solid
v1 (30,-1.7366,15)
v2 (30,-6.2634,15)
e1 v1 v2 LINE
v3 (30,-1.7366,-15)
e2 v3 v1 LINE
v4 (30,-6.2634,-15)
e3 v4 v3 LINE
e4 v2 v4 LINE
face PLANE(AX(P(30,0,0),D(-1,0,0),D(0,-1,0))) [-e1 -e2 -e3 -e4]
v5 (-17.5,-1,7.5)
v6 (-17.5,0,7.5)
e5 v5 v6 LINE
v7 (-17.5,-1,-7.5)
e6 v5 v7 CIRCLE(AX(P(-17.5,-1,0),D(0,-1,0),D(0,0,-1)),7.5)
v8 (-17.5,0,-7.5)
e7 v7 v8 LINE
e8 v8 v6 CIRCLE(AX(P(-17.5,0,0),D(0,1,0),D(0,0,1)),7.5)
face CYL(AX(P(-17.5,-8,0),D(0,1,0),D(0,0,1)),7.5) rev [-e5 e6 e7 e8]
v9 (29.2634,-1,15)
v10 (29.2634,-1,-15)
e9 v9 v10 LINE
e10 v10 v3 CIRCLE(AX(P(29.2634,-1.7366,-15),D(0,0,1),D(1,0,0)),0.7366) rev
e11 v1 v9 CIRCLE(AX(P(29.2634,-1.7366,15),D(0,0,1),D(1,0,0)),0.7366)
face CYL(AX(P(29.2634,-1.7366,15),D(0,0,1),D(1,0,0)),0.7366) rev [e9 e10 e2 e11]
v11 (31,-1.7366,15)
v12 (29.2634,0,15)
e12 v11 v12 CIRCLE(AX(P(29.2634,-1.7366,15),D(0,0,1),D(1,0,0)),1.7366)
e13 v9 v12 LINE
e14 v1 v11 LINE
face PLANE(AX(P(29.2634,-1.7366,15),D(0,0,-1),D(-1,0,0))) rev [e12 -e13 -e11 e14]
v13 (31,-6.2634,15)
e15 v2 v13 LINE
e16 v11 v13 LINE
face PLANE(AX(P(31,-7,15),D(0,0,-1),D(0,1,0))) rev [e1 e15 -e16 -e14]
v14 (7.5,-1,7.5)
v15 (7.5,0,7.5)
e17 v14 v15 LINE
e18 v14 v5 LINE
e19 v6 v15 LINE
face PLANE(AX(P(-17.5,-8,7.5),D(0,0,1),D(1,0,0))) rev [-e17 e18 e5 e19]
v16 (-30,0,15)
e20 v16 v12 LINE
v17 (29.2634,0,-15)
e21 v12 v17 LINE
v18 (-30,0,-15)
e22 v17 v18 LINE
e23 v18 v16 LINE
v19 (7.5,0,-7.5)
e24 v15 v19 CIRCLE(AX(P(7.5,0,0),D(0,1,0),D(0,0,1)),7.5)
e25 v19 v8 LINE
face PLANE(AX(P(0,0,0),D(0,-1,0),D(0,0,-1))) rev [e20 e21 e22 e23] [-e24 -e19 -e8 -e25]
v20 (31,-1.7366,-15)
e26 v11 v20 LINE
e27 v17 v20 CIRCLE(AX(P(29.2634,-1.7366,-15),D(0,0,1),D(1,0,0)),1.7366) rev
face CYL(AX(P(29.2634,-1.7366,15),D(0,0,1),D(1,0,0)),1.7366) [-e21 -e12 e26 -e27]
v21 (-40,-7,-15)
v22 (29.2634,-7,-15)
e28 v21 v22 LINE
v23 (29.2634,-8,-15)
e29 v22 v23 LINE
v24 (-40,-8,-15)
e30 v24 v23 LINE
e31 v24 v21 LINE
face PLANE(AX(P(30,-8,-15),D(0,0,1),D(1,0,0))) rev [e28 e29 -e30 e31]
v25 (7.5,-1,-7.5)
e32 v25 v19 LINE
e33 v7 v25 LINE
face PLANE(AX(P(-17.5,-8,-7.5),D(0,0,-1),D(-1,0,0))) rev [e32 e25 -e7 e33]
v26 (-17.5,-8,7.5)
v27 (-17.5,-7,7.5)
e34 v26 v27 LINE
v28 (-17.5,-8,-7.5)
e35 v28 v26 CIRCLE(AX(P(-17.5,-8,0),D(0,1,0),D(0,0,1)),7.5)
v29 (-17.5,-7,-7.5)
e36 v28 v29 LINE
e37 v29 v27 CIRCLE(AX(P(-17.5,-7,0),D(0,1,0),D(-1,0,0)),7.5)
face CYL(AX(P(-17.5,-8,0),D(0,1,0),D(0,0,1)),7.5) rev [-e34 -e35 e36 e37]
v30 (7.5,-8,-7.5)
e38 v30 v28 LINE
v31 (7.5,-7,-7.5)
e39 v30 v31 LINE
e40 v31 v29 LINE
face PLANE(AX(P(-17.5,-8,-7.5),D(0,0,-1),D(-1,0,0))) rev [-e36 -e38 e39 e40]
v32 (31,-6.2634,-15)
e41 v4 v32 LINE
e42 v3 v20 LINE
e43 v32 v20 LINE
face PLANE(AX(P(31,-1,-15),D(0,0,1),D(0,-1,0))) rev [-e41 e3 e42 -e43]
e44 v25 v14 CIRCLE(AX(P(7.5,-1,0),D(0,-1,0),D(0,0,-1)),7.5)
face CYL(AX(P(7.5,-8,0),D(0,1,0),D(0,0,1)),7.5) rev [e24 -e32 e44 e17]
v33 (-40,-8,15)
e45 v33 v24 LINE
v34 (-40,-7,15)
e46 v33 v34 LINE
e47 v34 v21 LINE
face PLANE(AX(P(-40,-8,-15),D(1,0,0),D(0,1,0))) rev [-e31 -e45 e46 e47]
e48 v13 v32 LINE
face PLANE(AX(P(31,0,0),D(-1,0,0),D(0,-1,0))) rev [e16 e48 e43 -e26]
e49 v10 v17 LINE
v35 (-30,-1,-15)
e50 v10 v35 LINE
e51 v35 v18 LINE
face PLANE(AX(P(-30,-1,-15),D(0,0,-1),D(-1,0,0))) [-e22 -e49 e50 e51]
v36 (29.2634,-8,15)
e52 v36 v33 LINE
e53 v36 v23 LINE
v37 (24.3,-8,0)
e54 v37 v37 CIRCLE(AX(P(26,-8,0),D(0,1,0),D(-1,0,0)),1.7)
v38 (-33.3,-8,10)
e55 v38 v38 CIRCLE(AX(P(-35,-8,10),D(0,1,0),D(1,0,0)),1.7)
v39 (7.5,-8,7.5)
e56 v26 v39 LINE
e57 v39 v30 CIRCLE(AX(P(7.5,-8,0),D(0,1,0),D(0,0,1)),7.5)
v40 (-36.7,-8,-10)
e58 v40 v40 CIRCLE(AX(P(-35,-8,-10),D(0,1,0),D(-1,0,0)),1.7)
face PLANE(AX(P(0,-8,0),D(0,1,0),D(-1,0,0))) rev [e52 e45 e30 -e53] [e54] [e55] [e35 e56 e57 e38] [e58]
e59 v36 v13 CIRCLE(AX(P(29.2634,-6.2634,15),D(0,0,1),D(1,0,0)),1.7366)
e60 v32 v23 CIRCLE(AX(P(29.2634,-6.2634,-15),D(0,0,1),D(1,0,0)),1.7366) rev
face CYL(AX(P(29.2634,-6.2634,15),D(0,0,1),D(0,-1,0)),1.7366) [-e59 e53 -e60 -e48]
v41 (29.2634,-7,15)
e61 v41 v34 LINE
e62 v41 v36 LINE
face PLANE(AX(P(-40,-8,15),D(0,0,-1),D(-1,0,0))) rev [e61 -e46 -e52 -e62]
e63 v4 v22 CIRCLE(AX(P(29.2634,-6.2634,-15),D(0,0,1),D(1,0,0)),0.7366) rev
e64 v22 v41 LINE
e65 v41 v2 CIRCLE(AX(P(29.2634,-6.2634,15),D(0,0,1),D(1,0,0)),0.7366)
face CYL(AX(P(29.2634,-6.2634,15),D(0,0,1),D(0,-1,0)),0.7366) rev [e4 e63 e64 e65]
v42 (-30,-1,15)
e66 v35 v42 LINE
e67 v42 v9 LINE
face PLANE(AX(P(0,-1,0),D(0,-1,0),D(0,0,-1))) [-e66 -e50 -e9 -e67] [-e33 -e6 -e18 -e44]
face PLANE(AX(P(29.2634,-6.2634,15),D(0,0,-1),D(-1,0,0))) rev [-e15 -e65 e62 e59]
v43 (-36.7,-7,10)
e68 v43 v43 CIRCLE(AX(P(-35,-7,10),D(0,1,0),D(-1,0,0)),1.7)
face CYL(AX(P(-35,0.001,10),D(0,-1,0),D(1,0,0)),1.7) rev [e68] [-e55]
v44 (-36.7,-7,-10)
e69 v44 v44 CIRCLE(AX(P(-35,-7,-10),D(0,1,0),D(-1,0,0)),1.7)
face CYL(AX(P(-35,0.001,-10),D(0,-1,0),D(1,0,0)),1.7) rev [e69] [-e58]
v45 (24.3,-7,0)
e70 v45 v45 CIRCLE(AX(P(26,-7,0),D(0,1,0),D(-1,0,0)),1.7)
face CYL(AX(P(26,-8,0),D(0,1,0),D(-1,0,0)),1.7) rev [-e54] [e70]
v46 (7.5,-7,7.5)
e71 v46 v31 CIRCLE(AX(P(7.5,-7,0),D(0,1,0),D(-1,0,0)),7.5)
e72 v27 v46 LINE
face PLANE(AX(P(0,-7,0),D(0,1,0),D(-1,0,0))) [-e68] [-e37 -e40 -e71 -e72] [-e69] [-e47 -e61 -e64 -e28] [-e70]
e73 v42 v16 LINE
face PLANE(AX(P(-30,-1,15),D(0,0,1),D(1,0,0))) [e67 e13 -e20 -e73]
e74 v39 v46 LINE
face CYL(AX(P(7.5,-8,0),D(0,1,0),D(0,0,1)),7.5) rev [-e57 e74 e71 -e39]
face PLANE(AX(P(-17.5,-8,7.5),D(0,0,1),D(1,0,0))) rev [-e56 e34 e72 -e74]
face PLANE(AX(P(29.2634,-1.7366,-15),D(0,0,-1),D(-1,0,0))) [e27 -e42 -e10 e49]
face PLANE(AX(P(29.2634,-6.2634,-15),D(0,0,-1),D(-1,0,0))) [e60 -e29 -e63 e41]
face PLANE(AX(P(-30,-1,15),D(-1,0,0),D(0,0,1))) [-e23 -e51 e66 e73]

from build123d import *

# Parameters (mm, degrees)
ESQUISSE2_W                           = 60
ESQUISSE2_H                           = 30
T_LE_DE_BASE_PLI_E1_DEPTH             = 1
T_LE_PLI_E_SUR_AR_TE1_STRIP_W         = 5.4732
T_LE_PLI_E_SUR_AR_TE1_STRIP_H         = 1
T_LE_PLI_E_SUR_AR_TE1_STRIP_CUT_DEPTH = 30
T_LE_PLI_E_SUR_AR_TE1_DEPTH           = 30
T_LE_PLI_E_SUR_AR_TE2_STRIP_W         = 5.4732
T_LE_PLI_E_SUR_AR_TE2_STRIP_H         = 1
T_LE_PLI_E_SUR_AR_TE2_STRIP_CUT_DEPTH = 30
T_LE_PLI_E_SUR_AR_TE2_DEPTH           = 30
ENL_V_MAT_EXTRU_1_DEPTH               = 44.462627624
ENL_V_MAT_EXTRU_2_REACH               = 45.463
ESQUISSE27_R                          = 1.7
ESQUISSE29_R                          = 1.7
ENL_V_MAT_EXTRU_3_DEPTH               = 44.289721644


# Sheet-metal steps are written as plain solids
with BuildPart() as part:
    # Esquisse2 → Tôle de base pliée1 (new body)
    with BuildSketch(Plane(origin=(0, 0, 0), x_dir=(1, 0, 0), z_dir=(0, 1, 0))):
        Rectangle(ESQUISSE2_W, ESQUISSE2_H)
    extrude(amount=-T_LE_DE_BASE_PLI_E1_DEPTH)

    # Tôle pliée sur arête1 strip (across the edge) → Tôle pliée sur arête1 strip cut (cut)
    with BuildSketch(Plane(origin=(30, -1, -15), x_dir=(-1, 0, 0), z_dir=(0, 0, 1))):
        with Locations((-2, -0.5)):
            Rectangle(T_LE_PLI_E_SUR_AR_TE1_STRIP_W, T_LE_PLI_E_SUR_AR_TE1_STRIP_H)
    extrude(amount=T_LE_PLI_E_SUR_AR_TE1_STRIP_CUT_DEPTH, mode=Mode.SUBTRACT)

    # Tôle pliée sur arête1 section (across the edge) → Tôle pliée sur arête1 (add)
    with BuildSketch(Plane(origin=(30, -1, -15), x_dir=(-1, 0, 0), z_dir=(0, 0, 1))):
        with BuildLine():
            Line((-1, 0.7366), (-1, 6))
            Line((-1, 6), (0, 6))
            Line((0, 6), (0, 0.7366))
            ThreePointArc((0, 0.7366), (0.215745145, 0.215745145), (0.7366, 0))
            Line((0.7366, 0), (0.7366, -1))
            ThreePointArc((0.7366, -1), (-0.491361636, -0.491361636), (-1, 0.7366))
        make_face()
    extrude(amount=T_LE_PLI_E_SUR_AR_TE1_DEPTH)

    # Tôle pliée sur arête2 strip (across the edge) → Tôle pliée sur arête2 strip cut (cut)
    with BuildSketch(Plane(origin=(30, -7, -15), x_dir=(0, 1, 0), z_dir=(0, 0, 1))):
        with Locations((-2, -0.5)):
            Rectangle(T_LE_PLI_E_SUR_AR_TE2_STRIP_W, T_LE_PLI_E_SUR_AR_TE2_STRIP_H)
    extrude(amount=T_LE_PLI_E_SUR_AR_TE2_STRIP_CUT_DEPTH, mode=Mode.SUBTRACT)

    # Tôle pliée sur arête2 section (across the edge) → Tôle pliée sur arête2 (add)
    with BuildSketch(Plane(origin=(30, -7, -15), x_dir=(0, 1, 0), z_dir=(0, 0, 1))):
        with BuildLine():
            Line((-1, 0.7366), (-1, 70))
            Line((-1, 70), (0, 70))
            Line((0, 70), (0, 0.7366))
            ThreePointArc((0, 0.7366), (0.215745145, 0.215745145), (0.7366, 0))
            Line((0.7366, 0), (0.7366, -1))
            ThreePointArc((0.7366, -1), (-0.491361636, -0.491361636), (-1, 0.7366))
        make_face()
    extrude(amount=T_LE_PLI_E_SUR_AR_TE2_DEPTH)

    # Esquisse26 → Enlèv. mat.-Extru.1 (cut, through all)
    with BuildSketch(Plane(origin=(0, 0, 0), x_dir=(1, 0, 0), z_dir=(0, 1, 0))):
        with BuildLine():
            Line((-17.5, 7.5), (7.5, 7.5))
            ThreePointArc((7.5, 7.5), (15, 0), (7.5, -7.5))
            Line((7.5, -7.5), (-17.5, -7.5))
            ThreePointArc((-17.5, -7.5), (-25, 0), (-17.5, 7.5))
        make_face()
    extrude(amount=-ENL_V_MAT_EXTRU_1_DEPTH, mode=Mode.SUBTRACT)

    # Esquisse27 → Enlèv. mat.-Extru.2 (cut, up to next)
    with BuildSketch(Plane(origin=(0, -8, 0), x_dir=(1, 0, 0), z_dir=(0, 1, 0)), mode=Mode.PRIVATE) as enl_v_mat_extru_2_sk1:
        with Locations(Location((-35, 10, 0), (0, 0, 180))):
            Circle(ESQUISSE27_R)
    enl_v_mat_extru_2_tool1 = extrude(enl_v_mat_extru_2_sk1.sketch, amount=ENL_V_MAT_EXTRU_2_REACH, mode=Mode.PRIVATE) & part.part
    # Esquisse27 → Enlèv. mat.-Extru.2 (cut, up to next)
    with BuildSketch(Plane(origin=(0, -8, 0), x_dir=(1, 0, 0), z_dir=(0, 1, 0)), mode=Mode.PRIVATE) as enl_v_mat_extru_2_sk2:
        with Locations((-35, -10)):
            Circle(ESQUISSE27_R)
    enl_v_mat_extru_2_tool2 = extrude(enl_v_mat_extru_2_sk2.sketch, amount=ENL_V_MAT_EXTRU_2_REACH, mode=Mode.PRIVATE) & part.part
    add(enl_v_mat_extru_2_tool1.solids().sort_by_distance((-35, -8, -10))[0], mode=Mode.SUBTRACT)
    add(enl_v_mat_extru_2_tool2.solids().sort_by_distance((-35, -8, 10))[0], mode=Mode.SUBTRACT)

    # Esquisse29 → Enlèv. mat.-Extru.3 (cut, through all)
    with BuildSketch(Plane(origin=(0, -7, 0), x_dir=(1, 0, 0), z_dir=(0, 1, 0))):
        with Locations(Location((26, 0, 0), (0, 0, 180))):
            Circle(ESQUISSE29_R)
    extrude(amount=-ENL_V_MAT_EXTRU_3_DEPTH, mode=Mode.SUBTRACT)


solid = part.part
